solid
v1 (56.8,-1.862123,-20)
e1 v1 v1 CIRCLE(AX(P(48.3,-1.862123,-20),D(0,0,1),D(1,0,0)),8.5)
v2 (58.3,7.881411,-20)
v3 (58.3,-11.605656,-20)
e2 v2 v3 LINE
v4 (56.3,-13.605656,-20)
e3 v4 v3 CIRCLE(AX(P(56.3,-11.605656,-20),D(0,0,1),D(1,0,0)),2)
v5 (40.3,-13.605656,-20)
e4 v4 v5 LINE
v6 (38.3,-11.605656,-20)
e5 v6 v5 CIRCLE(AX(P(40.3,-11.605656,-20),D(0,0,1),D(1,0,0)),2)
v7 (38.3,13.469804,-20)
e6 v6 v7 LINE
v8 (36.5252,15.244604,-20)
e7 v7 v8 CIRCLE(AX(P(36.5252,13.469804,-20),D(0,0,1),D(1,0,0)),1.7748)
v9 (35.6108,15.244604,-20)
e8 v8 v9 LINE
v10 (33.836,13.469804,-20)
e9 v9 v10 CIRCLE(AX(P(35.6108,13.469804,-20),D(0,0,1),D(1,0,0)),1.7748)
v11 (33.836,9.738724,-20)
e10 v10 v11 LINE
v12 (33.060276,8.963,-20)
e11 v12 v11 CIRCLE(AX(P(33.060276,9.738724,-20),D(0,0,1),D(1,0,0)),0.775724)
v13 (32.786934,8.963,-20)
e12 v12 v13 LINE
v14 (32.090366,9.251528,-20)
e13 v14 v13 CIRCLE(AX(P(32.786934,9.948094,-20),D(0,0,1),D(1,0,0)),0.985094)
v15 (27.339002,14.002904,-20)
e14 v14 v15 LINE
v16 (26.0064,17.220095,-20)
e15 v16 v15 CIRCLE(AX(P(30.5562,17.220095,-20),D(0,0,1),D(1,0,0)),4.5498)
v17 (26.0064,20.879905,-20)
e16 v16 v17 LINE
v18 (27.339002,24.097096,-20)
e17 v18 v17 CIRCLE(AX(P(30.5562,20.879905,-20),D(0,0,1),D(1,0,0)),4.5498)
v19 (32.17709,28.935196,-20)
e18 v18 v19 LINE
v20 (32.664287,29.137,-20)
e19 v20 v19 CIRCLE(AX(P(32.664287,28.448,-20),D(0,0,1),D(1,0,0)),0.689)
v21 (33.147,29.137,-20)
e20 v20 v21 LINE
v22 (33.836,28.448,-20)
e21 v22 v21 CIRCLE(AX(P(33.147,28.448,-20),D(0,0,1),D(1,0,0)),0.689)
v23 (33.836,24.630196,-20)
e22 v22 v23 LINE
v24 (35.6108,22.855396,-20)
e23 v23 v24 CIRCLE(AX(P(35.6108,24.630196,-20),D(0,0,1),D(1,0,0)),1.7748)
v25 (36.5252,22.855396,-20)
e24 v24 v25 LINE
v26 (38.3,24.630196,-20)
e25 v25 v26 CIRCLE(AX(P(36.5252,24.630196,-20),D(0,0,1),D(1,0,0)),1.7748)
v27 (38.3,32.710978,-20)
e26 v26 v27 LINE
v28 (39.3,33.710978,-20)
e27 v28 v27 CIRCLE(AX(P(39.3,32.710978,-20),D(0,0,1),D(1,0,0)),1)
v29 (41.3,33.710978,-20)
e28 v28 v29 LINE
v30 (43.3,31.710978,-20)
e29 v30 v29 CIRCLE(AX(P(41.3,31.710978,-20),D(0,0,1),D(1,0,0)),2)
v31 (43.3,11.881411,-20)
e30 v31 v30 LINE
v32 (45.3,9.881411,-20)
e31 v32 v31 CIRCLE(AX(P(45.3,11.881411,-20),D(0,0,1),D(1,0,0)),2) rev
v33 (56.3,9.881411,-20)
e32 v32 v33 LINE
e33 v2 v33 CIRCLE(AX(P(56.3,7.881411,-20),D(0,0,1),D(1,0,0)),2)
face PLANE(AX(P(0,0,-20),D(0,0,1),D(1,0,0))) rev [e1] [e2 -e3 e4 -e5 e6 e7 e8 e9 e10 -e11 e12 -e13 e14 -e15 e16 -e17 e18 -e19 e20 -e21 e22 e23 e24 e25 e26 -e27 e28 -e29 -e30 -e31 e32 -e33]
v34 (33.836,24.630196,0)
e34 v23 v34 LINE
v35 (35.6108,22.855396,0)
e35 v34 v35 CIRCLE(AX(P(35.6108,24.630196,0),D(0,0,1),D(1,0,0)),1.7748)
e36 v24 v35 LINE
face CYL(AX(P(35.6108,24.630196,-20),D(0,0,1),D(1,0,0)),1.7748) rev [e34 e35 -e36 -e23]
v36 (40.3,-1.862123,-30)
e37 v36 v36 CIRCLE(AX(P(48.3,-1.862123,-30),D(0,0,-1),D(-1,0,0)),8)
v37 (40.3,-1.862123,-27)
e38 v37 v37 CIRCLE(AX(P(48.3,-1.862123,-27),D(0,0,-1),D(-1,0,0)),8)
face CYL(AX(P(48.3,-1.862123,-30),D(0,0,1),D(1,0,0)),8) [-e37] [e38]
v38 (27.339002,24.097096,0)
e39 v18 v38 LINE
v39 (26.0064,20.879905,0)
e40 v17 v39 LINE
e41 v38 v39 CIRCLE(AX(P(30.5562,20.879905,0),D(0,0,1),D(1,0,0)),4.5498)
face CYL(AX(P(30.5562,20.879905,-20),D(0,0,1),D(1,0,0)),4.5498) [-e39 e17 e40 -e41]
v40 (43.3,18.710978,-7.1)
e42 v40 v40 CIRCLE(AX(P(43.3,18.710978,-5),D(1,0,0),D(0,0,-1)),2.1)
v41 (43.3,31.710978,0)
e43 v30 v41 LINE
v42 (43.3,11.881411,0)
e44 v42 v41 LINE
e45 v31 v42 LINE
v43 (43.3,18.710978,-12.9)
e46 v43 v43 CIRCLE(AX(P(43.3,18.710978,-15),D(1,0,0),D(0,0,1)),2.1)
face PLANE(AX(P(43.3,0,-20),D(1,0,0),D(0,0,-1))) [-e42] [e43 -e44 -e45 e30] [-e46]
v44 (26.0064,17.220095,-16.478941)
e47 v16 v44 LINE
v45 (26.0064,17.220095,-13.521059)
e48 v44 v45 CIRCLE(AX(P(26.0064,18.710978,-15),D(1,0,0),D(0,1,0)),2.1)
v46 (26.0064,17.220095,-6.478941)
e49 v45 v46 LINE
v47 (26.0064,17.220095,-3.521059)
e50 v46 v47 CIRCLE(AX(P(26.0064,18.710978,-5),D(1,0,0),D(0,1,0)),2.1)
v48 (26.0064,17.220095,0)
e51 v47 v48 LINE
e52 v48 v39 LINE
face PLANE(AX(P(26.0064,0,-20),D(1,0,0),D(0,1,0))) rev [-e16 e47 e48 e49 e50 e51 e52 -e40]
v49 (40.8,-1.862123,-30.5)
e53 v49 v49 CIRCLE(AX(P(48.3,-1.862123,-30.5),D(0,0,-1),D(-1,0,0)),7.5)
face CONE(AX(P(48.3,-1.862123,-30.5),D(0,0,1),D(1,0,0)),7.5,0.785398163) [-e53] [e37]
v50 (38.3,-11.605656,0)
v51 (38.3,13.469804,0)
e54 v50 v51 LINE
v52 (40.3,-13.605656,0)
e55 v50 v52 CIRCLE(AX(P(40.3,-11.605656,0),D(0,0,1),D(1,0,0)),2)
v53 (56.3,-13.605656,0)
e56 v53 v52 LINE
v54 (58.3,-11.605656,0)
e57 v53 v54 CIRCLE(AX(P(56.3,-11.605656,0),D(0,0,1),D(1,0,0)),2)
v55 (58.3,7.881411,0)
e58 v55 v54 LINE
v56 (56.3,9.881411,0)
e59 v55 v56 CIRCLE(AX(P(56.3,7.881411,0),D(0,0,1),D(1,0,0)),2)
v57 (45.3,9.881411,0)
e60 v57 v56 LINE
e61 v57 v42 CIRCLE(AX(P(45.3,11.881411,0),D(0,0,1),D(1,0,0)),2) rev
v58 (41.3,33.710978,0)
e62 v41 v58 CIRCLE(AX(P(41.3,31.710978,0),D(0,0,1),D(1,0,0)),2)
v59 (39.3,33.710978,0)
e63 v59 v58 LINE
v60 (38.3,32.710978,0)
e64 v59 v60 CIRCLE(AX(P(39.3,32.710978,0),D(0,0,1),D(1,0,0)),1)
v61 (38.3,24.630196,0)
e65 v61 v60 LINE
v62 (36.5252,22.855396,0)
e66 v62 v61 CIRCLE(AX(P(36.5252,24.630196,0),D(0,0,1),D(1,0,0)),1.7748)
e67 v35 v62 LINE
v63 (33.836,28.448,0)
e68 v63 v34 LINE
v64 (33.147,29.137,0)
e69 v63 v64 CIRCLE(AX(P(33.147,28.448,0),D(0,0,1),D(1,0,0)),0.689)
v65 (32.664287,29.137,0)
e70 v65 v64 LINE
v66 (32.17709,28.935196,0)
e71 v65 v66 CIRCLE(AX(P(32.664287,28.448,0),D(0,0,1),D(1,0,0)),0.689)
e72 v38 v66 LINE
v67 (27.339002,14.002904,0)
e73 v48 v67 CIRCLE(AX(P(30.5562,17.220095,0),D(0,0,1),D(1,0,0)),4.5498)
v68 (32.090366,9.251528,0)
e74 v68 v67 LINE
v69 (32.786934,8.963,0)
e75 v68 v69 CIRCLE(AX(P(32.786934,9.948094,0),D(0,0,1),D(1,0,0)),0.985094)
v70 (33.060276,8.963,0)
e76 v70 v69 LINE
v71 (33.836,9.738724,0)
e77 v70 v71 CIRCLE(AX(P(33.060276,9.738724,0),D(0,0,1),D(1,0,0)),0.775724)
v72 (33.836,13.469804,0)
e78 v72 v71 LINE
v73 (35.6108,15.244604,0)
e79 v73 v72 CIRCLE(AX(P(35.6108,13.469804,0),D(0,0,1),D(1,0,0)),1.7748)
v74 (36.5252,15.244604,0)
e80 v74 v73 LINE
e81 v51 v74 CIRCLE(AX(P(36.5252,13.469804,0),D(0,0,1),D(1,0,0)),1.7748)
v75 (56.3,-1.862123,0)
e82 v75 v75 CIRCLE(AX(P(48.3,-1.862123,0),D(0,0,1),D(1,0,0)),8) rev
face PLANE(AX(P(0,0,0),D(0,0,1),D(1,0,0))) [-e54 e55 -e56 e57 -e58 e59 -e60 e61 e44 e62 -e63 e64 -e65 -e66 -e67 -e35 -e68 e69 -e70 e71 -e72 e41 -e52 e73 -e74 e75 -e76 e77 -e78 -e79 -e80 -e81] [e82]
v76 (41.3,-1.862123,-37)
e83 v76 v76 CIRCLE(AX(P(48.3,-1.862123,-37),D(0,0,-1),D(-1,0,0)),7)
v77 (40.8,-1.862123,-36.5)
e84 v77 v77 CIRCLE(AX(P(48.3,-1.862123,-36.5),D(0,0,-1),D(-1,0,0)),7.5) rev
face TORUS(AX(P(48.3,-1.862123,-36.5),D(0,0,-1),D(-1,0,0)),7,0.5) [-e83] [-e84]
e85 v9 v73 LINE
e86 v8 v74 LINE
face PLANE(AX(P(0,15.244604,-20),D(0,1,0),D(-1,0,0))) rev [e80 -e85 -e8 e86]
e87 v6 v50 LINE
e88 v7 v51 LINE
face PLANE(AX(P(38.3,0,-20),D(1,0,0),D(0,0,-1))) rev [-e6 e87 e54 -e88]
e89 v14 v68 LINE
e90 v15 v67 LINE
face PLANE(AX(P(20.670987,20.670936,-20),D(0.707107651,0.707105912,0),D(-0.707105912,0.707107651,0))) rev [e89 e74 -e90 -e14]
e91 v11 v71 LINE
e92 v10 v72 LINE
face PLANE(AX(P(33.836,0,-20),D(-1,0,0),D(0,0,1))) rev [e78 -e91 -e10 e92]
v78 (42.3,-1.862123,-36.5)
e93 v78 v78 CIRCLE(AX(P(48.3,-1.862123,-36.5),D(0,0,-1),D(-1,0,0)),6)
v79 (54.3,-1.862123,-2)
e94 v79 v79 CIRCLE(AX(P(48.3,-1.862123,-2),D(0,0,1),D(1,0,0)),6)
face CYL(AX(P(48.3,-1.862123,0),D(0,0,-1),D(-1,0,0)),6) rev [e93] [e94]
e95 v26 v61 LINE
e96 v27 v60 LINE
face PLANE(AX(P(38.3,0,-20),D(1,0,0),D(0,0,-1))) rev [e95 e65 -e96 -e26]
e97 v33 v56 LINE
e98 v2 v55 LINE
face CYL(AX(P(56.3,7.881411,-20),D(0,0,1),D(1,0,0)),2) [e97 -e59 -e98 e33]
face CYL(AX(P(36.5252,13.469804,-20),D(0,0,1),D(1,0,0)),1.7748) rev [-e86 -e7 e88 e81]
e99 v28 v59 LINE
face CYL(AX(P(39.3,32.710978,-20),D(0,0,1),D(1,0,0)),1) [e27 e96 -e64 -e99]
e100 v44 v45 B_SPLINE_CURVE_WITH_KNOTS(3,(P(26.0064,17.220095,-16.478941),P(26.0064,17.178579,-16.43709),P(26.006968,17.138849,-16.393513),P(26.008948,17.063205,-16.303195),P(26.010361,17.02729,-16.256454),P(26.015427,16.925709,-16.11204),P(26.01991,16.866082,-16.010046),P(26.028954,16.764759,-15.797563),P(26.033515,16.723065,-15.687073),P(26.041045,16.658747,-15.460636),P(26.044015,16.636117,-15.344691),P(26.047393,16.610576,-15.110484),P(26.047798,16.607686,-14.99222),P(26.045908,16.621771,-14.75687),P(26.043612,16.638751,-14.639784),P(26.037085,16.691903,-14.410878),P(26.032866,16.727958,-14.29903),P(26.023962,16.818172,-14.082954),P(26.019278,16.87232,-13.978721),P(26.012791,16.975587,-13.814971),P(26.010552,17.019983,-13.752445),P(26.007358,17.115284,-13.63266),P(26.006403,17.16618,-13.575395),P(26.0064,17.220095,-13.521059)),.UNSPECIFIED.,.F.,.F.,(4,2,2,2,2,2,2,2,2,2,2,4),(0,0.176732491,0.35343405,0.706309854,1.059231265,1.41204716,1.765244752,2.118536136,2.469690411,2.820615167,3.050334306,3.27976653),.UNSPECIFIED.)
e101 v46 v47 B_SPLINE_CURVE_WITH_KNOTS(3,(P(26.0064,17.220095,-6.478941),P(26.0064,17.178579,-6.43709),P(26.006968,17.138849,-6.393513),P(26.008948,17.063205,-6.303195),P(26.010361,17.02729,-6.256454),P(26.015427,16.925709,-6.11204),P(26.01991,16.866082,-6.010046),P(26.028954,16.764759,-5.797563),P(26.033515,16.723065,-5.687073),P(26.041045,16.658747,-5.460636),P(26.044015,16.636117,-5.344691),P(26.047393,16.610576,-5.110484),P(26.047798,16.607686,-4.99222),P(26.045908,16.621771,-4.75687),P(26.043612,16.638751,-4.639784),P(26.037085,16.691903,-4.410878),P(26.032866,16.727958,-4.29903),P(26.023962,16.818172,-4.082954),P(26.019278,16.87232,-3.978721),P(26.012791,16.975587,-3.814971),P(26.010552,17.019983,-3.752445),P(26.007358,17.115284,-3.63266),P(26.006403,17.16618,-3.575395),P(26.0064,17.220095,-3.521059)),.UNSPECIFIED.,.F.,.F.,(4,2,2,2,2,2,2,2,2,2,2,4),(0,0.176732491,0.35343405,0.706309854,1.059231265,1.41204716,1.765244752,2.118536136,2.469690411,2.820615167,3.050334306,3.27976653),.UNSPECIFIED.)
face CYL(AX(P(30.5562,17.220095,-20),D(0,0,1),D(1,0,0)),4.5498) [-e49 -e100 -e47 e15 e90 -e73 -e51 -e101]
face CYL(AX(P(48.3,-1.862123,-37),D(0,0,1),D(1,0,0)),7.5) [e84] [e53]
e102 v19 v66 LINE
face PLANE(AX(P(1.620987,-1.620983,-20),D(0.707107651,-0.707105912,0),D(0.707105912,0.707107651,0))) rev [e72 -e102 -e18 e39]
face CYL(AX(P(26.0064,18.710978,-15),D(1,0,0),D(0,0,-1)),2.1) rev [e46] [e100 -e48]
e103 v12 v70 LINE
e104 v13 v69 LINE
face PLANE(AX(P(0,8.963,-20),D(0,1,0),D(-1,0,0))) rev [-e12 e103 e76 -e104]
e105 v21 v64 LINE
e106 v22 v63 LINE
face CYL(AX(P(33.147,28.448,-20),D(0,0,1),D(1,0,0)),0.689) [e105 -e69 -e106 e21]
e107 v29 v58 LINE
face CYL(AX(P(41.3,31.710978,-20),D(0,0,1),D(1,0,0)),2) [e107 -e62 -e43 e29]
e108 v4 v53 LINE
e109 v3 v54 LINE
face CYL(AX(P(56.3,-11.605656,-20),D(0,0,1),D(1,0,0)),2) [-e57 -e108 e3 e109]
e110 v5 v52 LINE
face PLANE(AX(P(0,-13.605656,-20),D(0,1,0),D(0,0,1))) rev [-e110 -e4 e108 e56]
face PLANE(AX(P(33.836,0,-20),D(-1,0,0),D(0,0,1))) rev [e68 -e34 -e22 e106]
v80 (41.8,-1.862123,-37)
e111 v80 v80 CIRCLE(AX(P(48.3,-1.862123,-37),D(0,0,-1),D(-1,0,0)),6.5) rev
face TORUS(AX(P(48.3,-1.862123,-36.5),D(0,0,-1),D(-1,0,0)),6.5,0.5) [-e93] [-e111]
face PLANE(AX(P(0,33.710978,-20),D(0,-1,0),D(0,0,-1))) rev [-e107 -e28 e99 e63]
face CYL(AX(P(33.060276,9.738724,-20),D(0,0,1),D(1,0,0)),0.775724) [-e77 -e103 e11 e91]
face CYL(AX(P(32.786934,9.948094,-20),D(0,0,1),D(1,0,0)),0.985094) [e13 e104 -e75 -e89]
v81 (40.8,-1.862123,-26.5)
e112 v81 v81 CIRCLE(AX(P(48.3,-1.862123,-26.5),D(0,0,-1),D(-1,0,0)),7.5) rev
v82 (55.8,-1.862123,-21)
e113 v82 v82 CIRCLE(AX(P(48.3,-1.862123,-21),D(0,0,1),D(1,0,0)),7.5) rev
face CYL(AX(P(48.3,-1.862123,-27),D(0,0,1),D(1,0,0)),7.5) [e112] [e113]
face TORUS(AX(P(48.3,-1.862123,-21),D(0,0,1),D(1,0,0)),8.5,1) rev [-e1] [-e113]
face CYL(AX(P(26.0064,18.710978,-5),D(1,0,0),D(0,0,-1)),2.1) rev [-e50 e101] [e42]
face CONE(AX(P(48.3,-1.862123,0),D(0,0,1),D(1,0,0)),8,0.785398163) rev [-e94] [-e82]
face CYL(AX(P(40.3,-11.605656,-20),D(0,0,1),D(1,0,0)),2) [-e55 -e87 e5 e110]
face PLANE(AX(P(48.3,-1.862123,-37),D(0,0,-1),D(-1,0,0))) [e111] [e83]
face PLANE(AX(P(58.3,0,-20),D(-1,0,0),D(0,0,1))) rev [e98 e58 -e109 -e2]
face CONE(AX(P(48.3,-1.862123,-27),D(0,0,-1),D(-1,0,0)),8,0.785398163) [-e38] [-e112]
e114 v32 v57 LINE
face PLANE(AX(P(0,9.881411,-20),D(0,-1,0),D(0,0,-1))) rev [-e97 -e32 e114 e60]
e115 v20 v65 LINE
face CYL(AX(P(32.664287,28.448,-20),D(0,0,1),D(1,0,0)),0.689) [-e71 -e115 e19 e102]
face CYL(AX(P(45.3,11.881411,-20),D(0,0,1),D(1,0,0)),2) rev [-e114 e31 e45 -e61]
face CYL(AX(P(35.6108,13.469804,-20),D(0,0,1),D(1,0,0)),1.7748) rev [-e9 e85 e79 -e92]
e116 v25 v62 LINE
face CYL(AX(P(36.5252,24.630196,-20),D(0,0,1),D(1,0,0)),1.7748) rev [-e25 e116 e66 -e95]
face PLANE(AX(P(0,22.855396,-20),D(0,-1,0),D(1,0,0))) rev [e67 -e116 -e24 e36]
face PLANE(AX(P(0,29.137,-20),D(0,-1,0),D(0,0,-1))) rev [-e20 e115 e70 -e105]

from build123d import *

# Parameters (mm, degrees)
BOSS_EXTRUDE1_DEPTH = 20
SKETCH3_R           = 2.1
CUT_EXTRUDE1_DEPTH  = 43.842719799
SKETCH4_R           = 7.5
BOSS_EXTRUDE2_DEPTH = 7
SKETCH5_R           = 8
BOSS_EXTRUDE3_DEPTH = 3
SKETCH6_R           = 7.5
BOSS_EXTRUDE4_DEPTH = 7
SKETCH7_R           = 6
CUT_EXTRUDE2_DEPTH  = 77.839573439
FILLET1_R           = 1
CHAMFER1_SIZE       = 0.5
CHAMFER2_SIZE       = 2
FILLET2_R           = 0.5


with BuildPart() as part:
    # Sketch1 → Boss-Extrude1 (new body)
    with BuildSketch(Plane.XY):
        with BuildLine():
            Line((38.3, 10.745623604), (38.3, 9.881410941))
            Line((38.3, 9.881410941), (38.3, 5.394343623))
            Line((38.3, 5.394343623), (38.3, -11.605656377))
            ThreePointArc((38.3, -11.605656377), (38.885786438, -13.01986994), (40.3, -13.605656377))
            Line((40.3, -13.605656377), (51.3, -13.605656377))
            Line((51.3, -13.605656377), (56.3, -13.605656377))
            ThreePointArc((56.3, -13.605656377), (57.714213562, -13.01986994), (58.3, -11.605656377))
            Line((58.3, -11.605656377), (58.3, 7.881410941))
            ThreePointArc((58.3, 7.881410941), (57.714213562, 9.295624503), (56.3, 9.881410941))
            Line((56.3, 9.881410941), (45.3, 9.881410941))
            ThreePointArc((45.3, 9.881410941), (43.885786438, 10.467197379), (43.3, 11.881410941))
            Line((43.3, 11.881410941), (43.3, 31.710978016))
            ThreePointArc((43.3, 31.710978016), (42.714213562, 33.125191579), (41.3, 33.710978016))
            Line((41.3, 33.710978016), (39.3, 33.710978016))
            ThreePointArc((39.3, 33.710978016), (38.592893219, 33.418084798), (38.3, 32.710978016))
            Line((38.3, 32.710978016), (38.3, 28.215588568))
            Line((38.3, 28.215588568), (38.3, 27.353495632))
            Line((38.3, 27.353495632), (38.3, 24.630195866))
            ThreePointArc((38.3, 24.630195866), (37.780173169, 23.37522288), (36.525200183, 22.855396049))
            Line((36.525200183, 22.855396049), (35.6108, 22.855396049))
            ThreePointArc((35.6108, 22.855396049), (34.355826885, 23.375222934), (33.836, 24.630196049))
            Line((33.836, 24.630196049), (33.836, 28.448))
            ThreePointArc((33.836, 28.448), (33.634196572, 28.935196572), (33.147, 29.137))
            Line((33.147, 29.137), (32.664287242, 29.137))
            ThreePointArc((32.664287242, 29.137), (32.400617966, 29.084552836), (32.177090071, 28.935195973))
            Line((32.177090071, 28.935195973), (27.33900161, 24.097095612))
            ThreePointArc((27.33900161, 24.097095612), (26.352731832, 22.621035632), (26.0064, 20.879905136))
            Line((26.0064, 20.879905136), (26.0064, 17.220094864))
            ThreePointArc((26.0064, 17.220094864), (26.352731832, 15.478964368), (27.33900161, 14.002904388))
            Line((27.33900161, 14.002904388), (32.090366071, 9.25152824))
            ThreePointArc((32.090366071, 9.25152824), (32.409953896, 9.037986056), (32.786933649, 8.963))
            Line((32.786933649, 8.963), (33.060275787, 8.963))
            ThreePointArc((33.060275787, 8.963), (33.608795638, 9.190204362), (33.836, 9.738724213))
            Line((33.836, 9.738724213), (33.836, 13.469803585))
            ThreePointArc((33.836, 13.469803585), (34.355826992, 14.724776959), (35.610800366, 15.244603951))
            Line((35.610800366, 15.244603951), (36.5252, 15.244603951))
            ThreePointArc((36.5252, 15.244603951), (37.780173115, 14.724777066), (38.3, 13.469803951))
            Line((38.3, 13.469803951), (38.3, 10.745623604))
        make_face()
    extrude(amount=-BOSS_EXTRUDE1_DEPTH)

    # Sketch3 → Cut-Extrude1 (cut, through all)
    with BuildSketch(Plane(origin=(43.3, 0, 0), x_dir=(0, 0, -1), z_dir=(1, 0, 0))):
        with Locations((5, 18.710978016)):
            Circle(SKETCH3_R)
        with Locations(Location((15, 18.710978016, 0), (0, 0, 314.769611651))):
            Circle(SKETCH3_R)
    extrude(amount=-CUT_EXTRUDE1_DEPTH, mode=Mode.SUBTRACT)

    # Sketch4 → Boss-Extrude2 (add)
    with BuildSketch(Plane(origin=(0, 0, -20), x_dir=(-1, 0, 0), z_dir=(0, 0, -1))):
        with Locations(Location((-48.3, -1.862122718, 0), (0, 0, 180))):
            Circle(SKETCH4_R)
    extrude(amount=BOSS_EXTRUDE2_DEPTH)

    # Sketch5 → Boss-Extrude3 (add)
    with BuildSketch(Plane(origin=(0, 0, -27), x_dir=(-1, 0, 0), z_dir=(0, 0, -1))):
        with Locations((-48.3, -1.862122718)):
            Circle(SKETCH5_R)
    extrude(amount=BOSS_EXTRUDE3_DEPTH)

    # Sketch6 → Boss-Extrude4 (add)
    with BuildSketch(Plane(origin=(0, 0, -30), x_dir=(-1, 0, 0), z_dir=(0, 0, -1))):
        with Locations(Location((-48.3, -1.862122718, 0), (0, 0, 180))):
            Circle(SKETCH6_R)
    extrude(amount=BOSS_EXTRUDE4_DEPTH)

    # Sketch7 → Cut-Extrude2 (cut, through all)
    with BuildSketch(Plane(origin=(0, 0, -37), x_dir=(-1, 0, 0), z_dir=(0, 0, -1))):
        with Locations((-48.3, -1.862122718)):
            Circle(SKETCH7_R)
    extrude(amount=-CUT_EXTRUDE2_DEPTH, mode=Mode.SUBTRACT)

    # Fillet1
    fillet1_edges = [part.edges().sort_by_distance(p)[0] for p in [
        (40.8, -1.862122718, -20),
    ]]
    fillet(fillet1_edges, radius=FILLET1_R)

    # Chamfer1
    chamfer1_edges = [part.edges().sort_by_distance(p)[0] for p in [
        (40.8, -1.862122718, -27),
        (40.8, -1.862122718, -30),
    ]]
    chamfer(chamfer1_edges, length=CHAMFER1_SIZE - 0.0001)  # a hair under: the kernel refuses the full size

    # Chamfer2
    chamfer2_edges = [part.edges().sort_by_distance(p)[0] for p in [
        (54.3, -1.862122718, 0),
    ]]
    chamfer(chamfer2_edges, length=CHAMFER2_SIZE)

    # Fillet2
    fillet2_edges = [part.edges().sort_by_distance(p)[0] for p in [
        (40.8, -1.862122718, -37),
        (54.3, -1.862122718, -37),
    ]]
    fillet(fillet2_edges, radius=FILLET2_R)


solid = part.part
